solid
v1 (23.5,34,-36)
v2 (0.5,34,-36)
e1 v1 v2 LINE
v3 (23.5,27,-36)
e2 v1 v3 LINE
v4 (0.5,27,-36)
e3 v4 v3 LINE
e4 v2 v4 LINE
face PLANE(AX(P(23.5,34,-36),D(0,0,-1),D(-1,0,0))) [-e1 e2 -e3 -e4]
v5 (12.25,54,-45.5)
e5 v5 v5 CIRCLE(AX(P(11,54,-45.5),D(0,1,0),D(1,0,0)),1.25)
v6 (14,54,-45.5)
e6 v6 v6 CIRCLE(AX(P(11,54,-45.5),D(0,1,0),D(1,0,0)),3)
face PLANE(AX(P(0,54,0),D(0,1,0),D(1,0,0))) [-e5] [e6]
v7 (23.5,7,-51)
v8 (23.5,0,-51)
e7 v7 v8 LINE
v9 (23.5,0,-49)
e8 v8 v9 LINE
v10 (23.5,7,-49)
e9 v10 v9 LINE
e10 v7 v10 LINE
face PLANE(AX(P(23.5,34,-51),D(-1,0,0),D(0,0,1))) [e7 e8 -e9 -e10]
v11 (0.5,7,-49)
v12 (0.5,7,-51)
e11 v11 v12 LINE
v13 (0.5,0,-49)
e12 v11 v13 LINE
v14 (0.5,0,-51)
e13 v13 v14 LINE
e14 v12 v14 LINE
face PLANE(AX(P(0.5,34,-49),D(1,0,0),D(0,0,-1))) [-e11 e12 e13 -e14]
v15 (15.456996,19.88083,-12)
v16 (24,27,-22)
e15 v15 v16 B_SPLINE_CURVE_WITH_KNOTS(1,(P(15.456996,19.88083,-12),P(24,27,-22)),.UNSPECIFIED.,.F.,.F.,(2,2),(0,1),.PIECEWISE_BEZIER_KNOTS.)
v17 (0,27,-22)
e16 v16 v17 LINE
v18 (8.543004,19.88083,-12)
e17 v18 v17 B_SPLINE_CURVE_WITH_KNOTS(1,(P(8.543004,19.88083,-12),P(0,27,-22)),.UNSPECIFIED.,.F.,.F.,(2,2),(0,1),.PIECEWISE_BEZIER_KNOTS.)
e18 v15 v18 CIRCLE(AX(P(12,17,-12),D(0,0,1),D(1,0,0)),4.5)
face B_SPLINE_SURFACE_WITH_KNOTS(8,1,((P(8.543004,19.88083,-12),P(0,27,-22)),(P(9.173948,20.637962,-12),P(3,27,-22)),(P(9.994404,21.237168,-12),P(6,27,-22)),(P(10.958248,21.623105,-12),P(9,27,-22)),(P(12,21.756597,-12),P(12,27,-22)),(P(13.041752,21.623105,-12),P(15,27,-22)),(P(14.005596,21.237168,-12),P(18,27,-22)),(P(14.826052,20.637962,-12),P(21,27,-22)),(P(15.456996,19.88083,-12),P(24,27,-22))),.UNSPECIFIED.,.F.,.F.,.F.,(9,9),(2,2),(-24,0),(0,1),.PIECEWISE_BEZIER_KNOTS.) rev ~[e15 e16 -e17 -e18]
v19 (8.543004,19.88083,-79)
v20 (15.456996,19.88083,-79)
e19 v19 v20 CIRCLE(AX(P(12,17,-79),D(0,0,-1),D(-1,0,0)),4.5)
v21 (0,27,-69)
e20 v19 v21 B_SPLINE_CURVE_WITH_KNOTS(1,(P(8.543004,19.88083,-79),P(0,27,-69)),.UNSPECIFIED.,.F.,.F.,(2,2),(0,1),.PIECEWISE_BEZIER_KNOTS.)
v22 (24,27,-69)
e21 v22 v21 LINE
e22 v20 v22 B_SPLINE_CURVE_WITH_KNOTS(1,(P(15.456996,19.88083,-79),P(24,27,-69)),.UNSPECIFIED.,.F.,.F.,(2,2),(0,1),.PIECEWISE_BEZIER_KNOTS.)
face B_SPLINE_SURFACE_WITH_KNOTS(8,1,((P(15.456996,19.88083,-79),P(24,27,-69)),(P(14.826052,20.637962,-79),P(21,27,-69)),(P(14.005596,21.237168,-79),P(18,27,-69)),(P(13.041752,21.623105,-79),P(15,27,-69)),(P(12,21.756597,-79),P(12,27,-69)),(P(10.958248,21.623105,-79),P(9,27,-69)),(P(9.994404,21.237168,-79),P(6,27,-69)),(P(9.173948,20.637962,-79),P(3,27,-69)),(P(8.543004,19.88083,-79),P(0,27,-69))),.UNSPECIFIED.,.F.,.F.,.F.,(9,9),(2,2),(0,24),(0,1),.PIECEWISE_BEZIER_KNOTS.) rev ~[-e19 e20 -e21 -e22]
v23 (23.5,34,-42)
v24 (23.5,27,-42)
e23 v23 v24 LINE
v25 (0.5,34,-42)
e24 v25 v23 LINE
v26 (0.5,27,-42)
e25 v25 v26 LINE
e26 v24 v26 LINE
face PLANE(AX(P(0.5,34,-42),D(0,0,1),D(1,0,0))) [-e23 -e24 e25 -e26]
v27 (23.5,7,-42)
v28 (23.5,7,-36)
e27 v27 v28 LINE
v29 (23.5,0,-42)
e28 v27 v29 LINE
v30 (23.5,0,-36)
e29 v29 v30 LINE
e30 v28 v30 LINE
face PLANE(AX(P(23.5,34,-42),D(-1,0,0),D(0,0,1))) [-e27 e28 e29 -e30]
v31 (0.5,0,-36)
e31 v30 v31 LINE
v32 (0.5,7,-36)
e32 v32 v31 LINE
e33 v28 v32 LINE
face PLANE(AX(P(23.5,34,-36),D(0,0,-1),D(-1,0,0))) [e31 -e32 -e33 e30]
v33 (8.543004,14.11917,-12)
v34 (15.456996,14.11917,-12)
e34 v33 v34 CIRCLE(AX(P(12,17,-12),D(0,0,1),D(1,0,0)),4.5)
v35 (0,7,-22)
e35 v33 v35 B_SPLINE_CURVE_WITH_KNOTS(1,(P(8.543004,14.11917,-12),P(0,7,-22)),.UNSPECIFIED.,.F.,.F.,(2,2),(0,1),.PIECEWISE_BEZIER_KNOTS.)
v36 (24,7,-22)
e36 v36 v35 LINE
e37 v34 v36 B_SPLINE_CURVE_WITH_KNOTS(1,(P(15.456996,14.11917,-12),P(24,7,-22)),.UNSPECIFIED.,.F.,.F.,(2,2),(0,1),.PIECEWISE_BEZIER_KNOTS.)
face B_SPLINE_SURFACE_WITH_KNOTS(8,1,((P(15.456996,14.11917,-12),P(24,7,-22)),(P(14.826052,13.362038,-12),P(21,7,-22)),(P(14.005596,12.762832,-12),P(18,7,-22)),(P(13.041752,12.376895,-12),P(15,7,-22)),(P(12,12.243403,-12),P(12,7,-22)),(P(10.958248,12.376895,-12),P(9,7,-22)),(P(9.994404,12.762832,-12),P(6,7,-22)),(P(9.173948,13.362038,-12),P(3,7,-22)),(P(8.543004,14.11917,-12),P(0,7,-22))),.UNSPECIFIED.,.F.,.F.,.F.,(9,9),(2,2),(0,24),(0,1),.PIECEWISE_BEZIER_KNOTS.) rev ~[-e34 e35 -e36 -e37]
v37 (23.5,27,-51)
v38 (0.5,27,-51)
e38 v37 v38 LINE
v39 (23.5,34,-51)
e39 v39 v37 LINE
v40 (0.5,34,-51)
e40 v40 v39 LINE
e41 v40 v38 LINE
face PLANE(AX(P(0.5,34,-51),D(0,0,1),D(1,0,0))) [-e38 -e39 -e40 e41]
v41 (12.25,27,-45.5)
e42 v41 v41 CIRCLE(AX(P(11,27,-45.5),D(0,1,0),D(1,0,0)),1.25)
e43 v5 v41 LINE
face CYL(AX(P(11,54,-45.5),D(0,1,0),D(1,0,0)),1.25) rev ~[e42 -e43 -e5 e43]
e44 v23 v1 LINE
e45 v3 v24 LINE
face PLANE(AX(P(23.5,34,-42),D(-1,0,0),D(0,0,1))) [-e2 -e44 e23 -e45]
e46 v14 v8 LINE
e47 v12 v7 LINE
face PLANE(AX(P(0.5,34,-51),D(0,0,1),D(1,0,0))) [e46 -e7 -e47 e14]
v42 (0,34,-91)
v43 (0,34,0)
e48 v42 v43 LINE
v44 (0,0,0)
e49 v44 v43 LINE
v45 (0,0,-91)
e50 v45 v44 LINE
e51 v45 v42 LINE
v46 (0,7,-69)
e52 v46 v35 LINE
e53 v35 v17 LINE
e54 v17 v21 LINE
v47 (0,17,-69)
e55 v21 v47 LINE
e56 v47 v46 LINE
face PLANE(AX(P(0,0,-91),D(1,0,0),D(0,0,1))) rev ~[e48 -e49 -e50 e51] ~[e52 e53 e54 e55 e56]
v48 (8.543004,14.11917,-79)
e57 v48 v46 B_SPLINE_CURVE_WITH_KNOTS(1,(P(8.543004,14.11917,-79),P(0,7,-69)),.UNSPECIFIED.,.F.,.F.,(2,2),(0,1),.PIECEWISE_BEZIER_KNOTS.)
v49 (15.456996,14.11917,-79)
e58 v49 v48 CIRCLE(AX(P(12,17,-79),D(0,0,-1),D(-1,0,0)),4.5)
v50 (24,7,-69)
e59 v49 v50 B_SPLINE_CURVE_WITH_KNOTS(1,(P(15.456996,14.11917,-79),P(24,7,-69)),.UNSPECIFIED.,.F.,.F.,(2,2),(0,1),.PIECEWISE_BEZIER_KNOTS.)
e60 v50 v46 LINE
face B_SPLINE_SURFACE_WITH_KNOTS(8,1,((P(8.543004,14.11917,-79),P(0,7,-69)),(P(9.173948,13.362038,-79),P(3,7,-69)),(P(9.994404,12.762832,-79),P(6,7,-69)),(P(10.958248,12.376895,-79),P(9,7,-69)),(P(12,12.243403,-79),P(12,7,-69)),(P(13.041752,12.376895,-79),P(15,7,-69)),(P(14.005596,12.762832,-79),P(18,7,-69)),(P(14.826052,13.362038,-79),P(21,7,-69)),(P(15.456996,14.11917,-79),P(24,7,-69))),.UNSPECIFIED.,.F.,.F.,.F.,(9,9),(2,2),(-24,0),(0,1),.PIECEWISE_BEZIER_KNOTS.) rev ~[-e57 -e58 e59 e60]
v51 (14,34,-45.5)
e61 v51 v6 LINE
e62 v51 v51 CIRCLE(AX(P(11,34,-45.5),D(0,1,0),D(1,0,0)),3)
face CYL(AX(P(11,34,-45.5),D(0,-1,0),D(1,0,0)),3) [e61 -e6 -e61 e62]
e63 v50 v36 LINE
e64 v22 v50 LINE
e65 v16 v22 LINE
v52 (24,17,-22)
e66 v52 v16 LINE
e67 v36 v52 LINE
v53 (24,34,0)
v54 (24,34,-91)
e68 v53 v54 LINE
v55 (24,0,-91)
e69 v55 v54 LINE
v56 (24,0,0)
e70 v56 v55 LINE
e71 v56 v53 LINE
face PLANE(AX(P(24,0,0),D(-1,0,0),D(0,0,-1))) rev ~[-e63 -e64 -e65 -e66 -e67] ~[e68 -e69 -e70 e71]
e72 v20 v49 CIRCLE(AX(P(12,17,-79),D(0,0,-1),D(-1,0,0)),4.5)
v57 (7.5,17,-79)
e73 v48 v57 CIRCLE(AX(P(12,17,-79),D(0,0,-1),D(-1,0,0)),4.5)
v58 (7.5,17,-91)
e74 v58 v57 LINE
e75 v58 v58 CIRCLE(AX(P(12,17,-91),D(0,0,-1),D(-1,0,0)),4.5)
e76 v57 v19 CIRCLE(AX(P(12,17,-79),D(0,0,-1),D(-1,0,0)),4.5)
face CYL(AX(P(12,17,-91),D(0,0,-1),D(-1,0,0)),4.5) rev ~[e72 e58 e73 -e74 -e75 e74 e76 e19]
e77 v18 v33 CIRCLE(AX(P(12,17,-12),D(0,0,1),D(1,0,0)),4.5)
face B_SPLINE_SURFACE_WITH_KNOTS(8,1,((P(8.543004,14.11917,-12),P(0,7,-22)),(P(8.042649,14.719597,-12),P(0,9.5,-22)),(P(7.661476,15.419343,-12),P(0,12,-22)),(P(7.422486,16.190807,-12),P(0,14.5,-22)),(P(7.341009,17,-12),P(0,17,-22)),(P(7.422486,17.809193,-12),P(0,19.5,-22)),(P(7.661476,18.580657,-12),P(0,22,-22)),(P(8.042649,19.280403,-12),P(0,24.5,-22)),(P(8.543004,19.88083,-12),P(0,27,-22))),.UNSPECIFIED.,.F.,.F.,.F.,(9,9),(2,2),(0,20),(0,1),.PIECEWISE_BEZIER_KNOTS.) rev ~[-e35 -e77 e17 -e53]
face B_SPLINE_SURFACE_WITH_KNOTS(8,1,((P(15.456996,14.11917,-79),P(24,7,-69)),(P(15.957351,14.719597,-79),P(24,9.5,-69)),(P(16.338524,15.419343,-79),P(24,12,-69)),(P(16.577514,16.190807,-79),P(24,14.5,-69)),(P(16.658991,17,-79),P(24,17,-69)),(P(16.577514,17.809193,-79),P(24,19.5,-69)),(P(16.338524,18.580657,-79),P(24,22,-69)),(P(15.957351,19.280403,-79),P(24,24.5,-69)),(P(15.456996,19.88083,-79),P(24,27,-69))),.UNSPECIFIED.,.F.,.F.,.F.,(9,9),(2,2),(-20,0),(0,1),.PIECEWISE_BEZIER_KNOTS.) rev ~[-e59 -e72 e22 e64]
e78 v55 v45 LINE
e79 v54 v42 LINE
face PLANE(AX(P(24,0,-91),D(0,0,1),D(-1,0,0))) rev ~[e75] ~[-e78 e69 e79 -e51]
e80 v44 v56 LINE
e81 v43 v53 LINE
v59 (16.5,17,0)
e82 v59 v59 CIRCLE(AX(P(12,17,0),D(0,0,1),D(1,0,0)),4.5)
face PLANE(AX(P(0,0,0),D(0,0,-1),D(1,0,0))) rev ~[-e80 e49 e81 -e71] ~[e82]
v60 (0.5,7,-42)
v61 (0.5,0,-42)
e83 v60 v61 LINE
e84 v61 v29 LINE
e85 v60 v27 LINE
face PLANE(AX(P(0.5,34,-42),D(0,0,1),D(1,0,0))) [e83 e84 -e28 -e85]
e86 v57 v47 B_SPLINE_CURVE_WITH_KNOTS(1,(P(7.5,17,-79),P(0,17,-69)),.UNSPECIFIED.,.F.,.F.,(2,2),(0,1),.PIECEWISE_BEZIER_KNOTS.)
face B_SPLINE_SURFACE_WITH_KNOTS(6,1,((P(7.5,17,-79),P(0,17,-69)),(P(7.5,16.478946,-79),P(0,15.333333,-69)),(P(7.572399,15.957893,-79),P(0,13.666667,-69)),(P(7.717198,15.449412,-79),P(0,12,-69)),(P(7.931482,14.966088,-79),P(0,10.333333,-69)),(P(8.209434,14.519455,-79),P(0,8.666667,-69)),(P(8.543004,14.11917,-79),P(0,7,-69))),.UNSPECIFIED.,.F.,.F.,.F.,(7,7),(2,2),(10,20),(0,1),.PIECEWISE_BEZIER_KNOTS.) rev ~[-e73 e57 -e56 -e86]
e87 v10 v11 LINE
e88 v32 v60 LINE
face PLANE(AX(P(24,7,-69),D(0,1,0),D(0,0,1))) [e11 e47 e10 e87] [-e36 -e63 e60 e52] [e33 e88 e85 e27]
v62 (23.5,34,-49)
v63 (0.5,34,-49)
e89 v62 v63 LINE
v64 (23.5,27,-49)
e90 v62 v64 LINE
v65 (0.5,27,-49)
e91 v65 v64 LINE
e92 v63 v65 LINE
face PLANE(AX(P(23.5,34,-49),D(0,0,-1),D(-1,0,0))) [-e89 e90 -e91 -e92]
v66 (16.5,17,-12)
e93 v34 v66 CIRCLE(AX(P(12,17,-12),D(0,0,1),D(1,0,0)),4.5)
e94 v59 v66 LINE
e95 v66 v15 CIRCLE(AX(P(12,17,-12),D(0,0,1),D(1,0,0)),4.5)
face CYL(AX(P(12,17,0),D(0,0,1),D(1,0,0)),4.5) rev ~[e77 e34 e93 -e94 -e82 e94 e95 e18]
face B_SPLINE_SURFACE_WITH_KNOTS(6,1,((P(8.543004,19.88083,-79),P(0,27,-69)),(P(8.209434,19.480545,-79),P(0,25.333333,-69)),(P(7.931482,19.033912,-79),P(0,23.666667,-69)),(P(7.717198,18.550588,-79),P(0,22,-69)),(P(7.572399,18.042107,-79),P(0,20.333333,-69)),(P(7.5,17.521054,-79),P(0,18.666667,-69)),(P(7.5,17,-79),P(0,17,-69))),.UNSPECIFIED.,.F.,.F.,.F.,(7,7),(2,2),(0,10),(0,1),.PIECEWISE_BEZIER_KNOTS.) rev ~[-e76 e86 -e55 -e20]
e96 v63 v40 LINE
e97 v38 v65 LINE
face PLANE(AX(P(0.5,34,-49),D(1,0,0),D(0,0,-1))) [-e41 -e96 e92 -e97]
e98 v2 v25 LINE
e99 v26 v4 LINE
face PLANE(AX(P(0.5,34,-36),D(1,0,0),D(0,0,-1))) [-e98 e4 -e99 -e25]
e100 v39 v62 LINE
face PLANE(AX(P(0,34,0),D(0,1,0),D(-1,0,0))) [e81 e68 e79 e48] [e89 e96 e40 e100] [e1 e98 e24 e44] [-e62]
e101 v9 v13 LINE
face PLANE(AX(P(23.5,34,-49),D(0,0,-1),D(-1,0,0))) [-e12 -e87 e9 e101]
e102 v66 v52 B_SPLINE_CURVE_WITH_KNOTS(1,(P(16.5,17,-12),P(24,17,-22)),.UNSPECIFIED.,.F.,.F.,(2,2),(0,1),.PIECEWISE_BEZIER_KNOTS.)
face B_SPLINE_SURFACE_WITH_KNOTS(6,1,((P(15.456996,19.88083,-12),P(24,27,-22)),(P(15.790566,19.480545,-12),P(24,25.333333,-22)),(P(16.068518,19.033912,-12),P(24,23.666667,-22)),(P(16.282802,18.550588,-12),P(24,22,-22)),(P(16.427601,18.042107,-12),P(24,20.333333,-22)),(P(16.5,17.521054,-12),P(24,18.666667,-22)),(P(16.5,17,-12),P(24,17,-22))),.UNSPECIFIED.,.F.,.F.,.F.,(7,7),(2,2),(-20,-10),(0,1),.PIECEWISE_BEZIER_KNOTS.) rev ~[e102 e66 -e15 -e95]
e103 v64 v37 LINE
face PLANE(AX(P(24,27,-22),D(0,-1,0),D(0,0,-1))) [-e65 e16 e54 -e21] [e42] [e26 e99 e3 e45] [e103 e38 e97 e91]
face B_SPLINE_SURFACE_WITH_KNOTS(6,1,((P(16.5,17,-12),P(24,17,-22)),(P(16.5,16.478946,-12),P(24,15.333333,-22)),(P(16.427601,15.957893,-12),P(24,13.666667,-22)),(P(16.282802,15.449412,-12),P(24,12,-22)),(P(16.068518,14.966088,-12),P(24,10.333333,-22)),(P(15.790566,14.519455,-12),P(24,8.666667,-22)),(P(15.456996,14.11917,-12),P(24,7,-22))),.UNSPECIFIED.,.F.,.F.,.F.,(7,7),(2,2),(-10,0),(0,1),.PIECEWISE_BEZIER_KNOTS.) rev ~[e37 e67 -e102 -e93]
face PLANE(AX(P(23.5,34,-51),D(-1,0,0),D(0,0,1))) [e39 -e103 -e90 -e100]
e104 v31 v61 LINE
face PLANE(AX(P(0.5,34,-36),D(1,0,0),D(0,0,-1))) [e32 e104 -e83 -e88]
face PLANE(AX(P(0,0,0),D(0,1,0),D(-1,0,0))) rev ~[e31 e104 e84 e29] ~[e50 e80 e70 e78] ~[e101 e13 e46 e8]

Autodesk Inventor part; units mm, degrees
ref_plane "YZ Plane" through (0, 0, 0) normal (1, 0, 0) x (0, 1, 0)
ref_plane "XZ Plane" through (0, 0, 0) normal (0, 1, 0) x (-1, 0, 0)
ref_plane "XY Plane" through (0, 0, 0) normal (0, 0, 1) x (1, 0, 0)
sketch "Sketch1" plane through (0, 0, 0) normal (0, 1, 0) x (-1, 0, 0)
  line L0 (0, 0) -> (-24, 0)
  line L1 (-24, 0) -> (-24, -91)
  line L2 (-24, -91) -> (0, -91)
  line L3 (0, -91) -> (0, 0)
  dimension "d0" = 91
  dimension "d1" = 24
extrude "Extrusion1" add sketch "Sketch1" along normal blind 34
sketch "Sketch2" plane through (24, 0, 0) normal (1, 0, 0) x (0, 0, -1)
  line L0 (22, 27) -> (69, 27)
  line L1 (69, 27) -> (69, 7)
  line L2 (69, 7) -> (22, 7)
  line L3 (22, 7) -> (22, 27)
  line L4 (0, 34) -> (91, 34) projected
  line L5 (0, 0) -> (91, 0) projected
  line L6 (0, 0) -> (0, 34) projected
  line L7 (91, 0) -> (91, 34) projected
  dimension "d4" = 7
  dimension "d5" = 7
  dimension "d6" = 22
  dimension "d7" = 22
extrude "Extrusion2" cut sketch "Sketch2" against normal up to surface (24 mm away) contours L0 L1 L2 L3
sketch "Sketch3" plane through (0, 34, 0) normal (0, 1, 0) x (1, 0, 0)
  line L0 (0.5, 42) -> (23.5, 42)
  line L1 (23.5, 42) -> (23.5, 36)
  line L2 (23.5, 36) -> (0.5, 36)
  line L3 (0.5, 36) -> (0.5, 42)
  line L4 (0, 91) -> (0, 0) projected
  line L5 (24, 0) -> (24, 91) projected
  line L6 (0, 0) -> (24, 0) projected
  dimension "d10" = 0.5
  dimension "d11" = 0.5
  dimension "d12" = 6
  dimension "d13" = 36
extrude "Extrusion3" cut sketch "Sketch3" against normal up to surface (34 mm away)
sketch "Sketch4" plane through (0, 34, 0) normal (0, 1, 0) x (1, 0, 0)
  line L0 (0.5, 51) -> (23.5, 51)
  line L1 (23.5, 51) -> (23.5, 49)
  line L2 (23.5, 49) -> (0.5, 49)
  line L3 (0.5, 49) -> (0.5, 51)
  line L4 (0.5, 42) -> (23.5, 42) projected
  line L5 (24, 0) -> (24, 91) projected
  line L6 (0, 91) -> (0, 0) projected
  dimension "d16" = 2
  dimension "d17" = 7
  dimension "d18" = 0.5
  dimension "d19" = 0.5
extrude "Extrusion4" cut sketch "Sketch4" against normal up to surface (34 mm away)
sketch "Sketch5" plane through (0, 0, 0) normal (0, 0, 1) x (1, 0, 0)
  circle A0 centre (12, 17) radius 4.5
  line L0 (0, 0) -> (24, 0) projected
  line L1 (24, 0) -> (24, 34) projected
  dimension "d22" = 17
  dimension "d23" = 12
  dimension "d24" = 9
extrude "Extrusion5" cut sketch "Sketch5" against normal blind 12
loft "Loft1" cut section 1 edges at (7.5, 17, -12) section 2 edges at (0, 17, -22) (12, 27, -22) (24, 17, -22) (12, 7, -22)
sketch "Sketch6" plane through (24, 0, -91) normal (0, 0, -1) x (-1, 0, 0)
  circle A0 centre (12, 17) radius 4.5
  line L0 (24, 0) -> (24, 34) projected
  line L1 (0, 0) -> (24, 0) projected
  dimension "d31" = 12
  dimension "d32" = 17
  dimension "d33" = 9
extrude "Extrusion6" cut sketch "Sketch6" against normal blind 12
loft "Loft2" cut section 1 edges at (16.5, 17, -79) section 2 edges at (0, 17, -69) (12, 7, -69) (24, 17, -69) (12, 27, -69)
sketch "Sketch7" plane through (0, 34, 0) normal (0, 1, 0) x (1, 0, 0)
  circle A0 centre (11, 45.5) radius 3
  line L0 (0, 91) -> (0, 0) projected
  line L1 (24, 0) -> (24, 91) projected
  line L2 (0.5, 42) -> (23.5, 42) projected
  line L3 (23.5, 49) -> (0.5, 49) projected
  dimension "d40" = 11
  dimension "d41" = 13
  dimension "d42" = 3.5
  dimension "d43" = 3.5
  dimension "d44" = 6
extrude "Extrusion7" add sketch "Sketch7" along normal blind 20
sketch "Sketch8" plane through (11, 54, -45.5) normal (0, 1, 0) x (1, 0, 0)
  circle A0 centre (0, 0) radius 1.25
  point P0 (-11, -45.5)
  dimension "d47" = 2.5
extrude "Extrusion8" cut sketch "Sketch8" against normal up to surface (27 mm away)
properties part number "20220727_1cell_PBME"
